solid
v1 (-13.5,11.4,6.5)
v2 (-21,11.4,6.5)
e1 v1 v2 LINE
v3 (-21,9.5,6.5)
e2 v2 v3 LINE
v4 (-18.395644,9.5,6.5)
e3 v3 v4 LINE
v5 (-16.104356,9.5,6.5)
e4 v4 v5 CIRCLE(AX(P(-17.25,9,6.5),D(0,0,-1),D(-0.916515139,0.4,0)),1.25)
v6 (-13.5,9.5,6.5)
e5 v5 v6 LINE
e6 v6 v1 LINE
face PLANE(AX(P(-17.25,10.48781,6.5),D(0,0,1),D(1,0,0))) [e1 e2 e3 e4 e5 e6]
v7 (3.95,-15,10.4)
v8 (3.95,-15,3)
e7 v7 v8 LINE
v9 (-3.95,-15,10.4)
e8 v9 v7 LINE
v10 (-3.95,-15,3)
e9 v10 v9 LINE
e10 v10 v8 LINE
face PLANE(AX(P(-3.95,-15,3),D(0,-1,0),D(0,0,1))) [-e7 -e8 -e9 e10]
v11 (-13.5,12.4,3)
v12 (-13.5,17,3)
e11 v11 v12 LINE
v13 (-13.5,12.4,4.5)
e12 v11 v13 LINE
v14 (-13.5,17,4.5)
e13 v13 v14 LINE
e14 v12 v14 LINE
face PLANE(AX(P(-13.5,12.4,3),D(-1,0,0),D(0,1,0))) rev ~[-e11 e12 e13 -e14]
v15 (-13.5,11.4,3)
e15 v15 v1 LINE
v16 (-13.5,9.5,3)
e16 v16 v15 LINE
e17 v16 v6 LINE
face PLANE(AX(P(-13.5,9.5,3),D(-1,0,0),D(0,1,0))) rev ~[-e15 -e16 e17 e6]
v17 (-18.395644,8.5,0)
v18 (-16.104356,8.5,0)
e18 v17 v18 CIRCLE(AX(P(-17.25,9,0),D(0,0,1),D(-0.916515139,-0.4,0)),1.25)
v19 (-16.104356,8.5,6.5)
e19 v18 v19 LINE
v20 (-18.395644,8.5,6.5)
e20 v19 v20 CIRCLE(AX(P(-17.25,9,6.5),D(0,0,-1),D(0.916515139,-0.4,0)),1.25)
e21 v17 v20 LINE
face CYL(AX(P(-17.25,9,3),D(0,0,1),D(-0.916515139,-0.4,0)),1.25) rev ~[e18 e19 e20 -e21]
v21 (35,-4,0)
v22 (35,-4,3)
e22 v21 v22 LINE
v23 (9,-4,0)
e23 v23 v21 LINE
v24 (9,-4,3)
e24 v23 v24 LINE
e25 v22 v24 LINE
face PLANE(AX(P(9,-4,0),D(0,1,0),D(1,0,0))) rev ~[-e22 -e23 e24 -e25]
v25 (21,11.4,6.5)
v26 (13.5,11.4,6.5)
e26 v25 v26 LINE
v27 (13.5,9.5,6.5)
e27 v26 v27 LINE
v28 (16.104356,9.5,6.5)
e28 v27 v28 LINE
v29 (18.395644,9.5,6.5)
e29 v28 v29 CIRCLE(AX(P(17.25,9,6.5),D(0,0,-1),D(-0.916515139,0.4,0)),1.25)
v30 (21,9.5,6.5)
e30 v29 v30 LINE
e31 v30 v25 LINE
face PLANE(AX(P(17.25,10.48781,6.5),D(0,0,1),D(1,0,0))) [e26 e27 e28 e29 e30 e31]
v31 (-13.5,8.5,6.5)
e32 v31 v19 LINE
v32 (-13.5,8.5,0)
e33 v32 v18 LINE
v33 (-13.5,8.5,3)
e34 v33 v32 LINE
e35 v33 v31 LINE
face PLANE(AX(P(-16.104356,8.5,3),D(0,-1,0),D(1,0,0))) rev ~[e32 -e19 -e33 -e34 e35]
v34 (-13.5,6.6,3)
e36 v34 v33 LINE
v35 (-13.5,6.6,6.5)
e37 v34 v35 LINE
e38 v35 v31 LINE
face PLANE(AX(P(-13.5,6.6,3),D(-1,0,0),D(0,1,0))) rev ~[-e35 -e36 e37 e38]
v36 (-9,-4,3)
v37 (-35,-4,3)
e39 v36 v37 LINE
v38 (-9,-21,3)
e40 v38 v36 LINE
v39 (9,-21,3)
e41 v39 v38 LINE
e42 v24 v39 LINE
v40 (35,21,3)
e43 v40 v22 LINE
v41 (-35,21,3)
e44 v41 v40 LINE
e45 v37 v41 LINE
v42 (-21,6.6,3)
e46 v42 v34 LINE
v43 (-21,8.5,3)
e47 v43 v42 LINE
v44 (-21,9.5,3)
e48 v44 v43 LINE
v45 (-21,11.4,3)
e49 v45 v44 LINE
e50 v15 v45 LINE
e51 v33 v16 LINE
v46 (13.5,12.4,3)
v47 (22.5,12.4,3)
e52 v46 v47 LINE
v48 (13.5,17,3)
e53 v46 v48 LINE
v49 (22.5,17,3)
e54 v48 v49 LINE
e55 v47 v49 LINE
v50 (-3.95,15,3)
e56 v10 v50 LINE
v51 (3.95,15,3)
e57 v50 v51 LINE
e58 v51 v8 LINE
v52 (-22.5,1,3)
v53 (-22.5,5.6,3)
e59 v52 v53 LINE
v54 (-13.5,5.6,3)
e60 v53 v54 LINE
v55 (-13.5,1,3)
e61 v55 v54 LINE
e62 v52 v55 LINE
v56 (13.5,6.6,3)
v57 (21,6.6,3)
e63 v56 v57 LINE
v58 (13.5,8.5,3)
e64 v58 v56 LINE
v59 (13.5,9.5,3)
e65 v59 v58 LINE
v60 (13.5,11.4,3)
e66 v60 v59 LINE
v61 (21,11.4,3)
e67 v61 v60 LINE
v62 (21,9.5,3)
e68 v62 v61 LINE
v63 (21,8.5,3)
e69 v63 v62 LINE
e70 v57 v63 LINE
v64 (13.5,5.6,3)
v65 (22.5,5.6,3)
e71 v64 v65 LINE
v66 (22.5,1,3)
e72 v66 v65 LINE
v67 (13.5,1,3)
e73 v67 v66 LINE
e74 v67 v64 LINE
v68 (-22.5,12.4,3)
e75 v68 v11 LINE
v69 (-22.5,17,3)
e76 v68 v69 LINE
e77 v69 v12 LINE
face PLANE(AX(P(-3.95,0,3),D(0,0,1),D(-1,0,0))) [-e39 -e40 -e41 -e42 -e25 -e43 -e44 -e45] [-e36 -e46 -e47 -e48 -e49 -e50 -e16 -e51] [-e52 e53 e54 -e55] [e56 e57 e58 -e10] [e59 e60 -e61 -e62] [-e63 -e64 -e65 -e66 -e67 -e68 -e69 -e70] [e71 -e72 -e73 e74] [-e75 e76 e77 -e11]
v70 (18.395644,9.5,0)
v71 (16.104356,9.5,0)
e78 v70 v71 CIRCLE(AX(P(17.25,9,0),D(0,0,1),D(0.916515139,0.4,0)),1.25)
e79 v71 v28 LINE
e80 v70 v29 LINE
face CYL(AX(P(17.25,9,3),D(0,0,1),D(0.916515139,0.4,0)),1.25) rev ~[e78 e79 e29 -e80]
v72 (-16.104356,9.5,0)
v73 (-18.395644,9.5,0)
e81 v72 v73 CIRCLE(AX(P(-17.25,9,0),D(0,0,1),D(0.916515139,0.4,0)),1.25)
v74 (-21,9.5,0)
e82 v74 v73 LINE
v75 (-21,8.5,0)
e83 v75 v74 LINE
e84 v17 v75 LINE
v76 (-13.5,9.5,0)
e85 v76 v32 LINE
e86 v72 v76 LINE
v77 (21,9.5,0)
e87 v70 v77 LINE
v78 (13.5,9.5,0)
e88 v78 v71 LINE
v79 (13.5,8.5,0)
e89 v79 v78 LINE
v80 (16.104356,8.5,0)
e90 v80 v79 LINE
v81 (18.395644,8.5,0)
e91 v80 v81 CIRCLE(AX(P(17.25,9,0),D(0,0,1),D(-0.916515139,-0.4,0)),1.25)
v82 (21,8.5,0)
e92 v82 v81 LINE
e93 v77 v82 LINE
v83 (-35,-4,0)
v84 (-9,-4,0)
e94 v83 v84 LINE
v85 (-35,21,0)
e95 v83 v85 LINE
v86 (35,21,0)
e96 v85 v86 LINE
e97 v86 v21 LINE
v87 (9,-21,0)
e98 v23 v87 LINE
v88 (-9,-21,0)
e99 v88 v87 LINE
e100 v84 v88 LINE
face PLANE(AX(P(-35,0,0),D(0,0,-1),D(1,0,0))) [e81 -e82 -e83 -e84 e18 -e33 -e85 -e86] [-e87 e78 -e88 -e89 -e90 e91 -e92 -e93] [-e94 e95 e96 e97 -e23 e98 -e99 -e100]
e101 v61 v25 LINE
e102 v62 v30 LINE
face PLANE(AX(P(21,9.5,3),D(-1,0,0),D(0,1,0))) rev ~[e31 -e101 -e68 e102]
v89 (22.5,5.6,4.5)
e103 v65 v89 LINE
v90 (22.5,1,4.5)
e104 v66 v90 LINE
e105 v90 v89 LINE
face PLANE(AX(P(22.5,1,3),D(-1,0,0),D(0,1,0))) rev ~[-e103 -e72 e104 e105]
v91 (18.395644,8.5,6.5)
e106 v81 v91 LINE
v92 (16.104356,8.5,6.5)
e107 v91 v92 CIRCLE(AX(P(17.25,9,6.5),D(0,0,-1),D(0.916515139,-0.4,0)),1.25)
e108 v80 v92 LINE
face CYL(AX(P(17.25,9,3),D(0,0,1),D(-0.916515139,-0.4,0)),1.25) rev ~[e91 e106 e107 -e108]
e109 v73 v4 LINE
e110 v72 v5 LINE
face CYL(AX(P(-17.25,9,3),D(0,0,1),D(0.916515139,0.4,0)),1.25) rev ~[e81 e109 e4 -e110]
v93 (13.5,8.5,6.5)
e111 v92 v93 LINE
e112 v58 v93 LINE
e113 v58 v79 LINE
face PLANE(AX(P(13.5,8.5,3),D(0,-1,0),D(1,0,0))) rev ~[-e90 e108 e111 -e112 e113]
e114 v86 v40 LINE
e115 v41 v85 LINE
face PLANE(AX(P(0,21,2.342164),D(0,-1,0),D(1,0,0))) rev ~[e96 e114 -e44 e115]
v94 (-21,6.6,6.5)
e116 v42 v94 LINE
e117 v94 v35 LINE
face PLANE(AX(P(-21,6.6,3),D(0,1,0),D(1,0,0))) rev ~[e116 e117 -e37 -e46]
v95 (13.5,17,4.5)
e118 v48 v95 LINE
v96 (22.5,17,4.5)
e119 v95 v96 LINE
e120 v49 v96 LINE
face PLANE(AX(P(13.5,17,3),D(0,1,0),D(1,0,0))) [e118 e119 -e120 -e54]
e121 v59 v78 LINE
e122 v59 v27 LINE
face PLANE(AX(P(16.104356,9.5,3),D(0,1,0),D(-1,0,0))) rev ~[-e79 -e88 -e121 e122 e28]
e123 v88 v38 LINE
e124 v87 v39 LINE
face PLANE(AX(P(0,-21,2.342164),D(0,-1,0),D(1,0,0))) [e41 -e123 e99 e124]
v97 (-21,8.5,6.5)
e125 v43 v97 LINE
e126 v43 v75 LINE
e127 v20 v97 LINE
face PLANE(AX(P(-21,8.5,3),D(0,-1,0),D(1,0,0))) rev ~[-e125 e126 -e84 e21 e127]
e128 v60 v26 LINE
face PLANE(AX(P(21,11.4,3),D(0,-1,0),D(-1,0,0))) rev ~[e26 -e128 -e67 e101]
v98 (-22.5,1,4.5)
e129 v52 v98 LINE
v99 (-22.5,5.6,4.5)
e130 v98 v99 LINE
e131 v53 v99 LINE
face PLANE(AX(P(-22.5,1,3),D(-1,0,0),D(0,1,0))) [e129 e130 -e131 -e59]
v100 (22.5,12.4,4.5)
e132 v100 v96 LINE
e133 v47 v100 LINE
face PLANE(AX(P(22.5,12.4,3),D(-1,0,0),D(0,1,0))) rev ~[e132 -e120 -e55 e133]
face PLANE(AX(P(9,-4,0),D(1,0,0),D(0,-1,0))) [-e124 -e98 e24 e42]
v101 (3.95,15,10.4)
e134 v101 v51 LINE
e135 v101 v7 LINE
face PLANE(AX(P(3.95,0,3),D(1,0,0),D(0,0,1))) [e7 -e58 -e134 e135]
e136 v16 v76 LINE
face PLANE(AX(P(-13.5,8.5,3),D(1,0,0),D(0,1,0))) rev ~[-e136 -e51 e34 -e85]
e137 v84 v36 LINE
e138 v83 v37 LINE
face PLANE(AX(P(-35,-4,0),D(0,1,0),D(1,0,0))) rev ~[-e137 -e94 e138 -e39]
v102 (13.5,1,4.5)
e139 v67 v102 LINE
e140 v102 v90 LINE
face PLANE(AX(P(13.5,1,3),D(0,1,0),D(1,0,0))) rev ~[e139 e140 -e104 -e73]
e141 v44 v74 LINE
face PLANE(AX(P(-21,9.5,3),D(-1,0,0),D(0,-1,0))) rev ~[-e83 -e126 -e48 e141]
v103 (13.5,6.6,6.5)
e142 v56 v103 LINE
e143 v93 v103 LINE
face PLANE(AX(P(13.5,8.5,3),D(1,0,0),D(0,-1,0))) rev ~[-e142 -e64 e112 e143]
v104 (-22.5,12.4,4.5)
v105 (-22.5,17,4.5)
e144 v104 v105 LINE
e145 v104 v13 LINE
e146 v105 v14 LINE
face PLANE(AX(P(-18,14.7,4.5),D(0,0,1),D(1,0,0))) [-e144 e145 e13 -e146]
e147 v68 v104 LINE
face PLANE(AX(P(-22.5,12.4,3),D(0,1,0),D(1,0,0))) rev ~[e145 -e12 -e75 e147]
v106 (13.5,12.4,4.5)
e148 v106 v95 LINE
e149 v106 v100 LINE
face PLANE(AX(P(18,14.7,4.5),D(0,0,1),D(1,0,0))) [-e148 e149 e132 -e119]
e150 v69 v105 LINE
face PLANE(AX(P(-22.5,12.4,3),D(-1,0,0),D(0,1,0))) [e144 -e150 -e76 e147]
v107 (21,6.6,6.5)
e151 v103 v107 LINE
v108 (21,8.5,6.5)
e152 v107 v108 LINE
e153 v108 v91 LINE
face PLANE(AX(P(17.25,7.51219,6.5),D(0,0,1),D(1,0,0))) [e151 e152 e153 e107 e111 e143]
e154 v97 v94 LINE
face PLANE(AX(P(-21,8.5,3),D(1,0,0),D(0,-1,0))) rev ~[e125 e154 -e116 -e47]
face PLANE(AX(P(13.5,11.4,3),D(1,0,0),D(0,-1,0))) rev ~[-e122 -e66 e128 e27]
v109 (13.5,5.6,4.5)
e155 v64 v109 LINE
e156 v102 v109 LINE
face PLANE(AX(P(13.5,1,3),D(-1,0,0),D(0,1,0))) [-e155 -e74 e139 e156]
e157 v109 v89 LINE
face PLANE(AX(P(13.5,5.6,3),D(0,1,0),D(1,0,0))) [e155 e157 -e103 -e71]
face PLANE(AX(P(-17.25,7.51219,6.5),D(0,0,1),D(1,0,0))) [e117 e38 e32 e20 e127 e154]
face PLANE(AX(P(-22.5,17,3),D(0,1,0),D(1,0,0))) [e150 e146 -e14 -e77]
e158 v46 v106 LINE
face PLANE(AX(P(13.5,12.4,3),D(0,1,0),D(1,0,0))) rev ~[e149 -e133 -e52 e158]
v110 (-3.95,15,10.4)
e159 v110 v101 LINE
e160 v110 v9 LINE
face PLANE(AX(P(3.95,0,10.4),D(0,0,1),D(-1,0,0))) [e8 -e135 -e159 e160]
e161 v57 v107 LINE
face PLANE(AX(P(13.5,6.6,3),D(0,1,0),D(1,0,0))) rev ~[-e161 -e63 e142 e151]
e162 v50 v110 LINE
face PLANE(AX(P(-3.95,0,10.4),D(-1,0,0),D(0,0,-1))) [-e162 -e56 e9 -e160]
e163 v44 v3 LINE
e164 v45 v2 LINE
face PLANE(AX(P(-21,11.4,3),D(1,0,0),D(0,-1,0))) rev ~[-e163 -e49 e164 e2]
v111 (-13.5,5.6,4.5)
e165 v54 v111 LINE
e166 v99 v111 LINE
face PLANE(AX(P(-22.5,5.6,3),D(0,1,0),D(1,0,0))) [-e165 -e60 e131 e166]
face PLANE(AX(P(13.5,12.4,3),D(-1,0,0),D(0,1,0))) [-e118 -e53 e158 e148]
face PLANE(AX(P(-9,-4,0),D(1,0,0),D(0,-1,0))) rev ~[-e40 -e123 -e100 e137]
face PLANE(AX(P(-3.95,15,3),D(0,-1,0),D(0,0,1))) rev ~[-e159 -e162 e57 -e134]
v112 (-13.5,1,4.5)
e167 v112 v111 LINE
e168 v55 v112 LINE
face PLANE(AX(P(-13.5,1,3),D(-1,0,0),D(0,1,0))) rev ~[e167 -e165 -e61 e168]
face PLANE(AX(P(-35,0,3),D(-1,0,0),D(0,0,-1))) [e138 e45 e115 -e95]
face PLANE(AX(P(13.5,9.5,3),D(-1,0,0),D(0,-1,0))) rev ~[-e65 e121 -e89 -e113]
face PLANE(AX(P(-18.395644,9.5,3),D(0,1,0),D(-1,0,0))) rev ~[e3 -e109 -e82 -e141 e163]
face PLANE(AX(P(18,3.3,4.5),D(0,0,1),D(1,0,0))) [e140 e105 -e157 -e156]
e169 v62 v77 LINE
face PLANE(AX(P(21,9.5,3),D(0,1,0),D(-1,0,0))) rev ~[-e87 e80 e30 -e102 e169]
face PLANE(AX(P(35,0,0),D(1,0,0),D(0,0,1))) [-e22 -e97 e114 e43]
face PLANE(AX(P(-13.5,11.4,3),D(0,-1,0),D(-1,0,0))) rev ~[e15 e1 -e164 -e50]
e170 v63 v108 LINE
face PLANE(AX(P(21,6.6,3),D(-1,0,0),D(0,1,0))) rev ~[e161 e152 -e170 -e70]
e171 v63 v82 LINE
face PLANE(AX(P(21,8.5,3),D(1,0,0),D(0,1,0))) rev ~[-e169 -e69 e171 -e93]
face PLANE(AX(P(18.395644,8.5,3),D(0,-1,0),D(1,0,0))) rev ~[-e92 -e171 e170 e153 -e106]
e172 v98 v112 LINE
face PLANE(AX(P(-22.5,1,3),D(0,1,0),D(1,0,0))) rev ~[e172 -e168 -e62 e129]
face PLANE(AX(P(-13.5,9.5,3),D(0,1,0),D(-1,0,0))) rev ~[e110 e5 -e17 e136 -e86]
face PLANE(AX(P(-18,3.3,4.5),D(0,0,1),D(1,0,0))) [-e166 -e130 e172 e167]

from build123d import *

# Parameters (mm, degrees)
F1_DEPTH = 21
F2_W     = 26
F2_H     = 17
F3_DEPTH = 25
F4_W     = 6
F4_H     = 7.4
F5_DEPTH = 25
F6_W     = 9
F6_H     = 4.6
F7_DEPTH = 1.5
F8_DEPTH = 3.5
F9_DEPTH = 3.001


with BuildPart() as f1:
    # F0 (on Front) → F1 (new body, symmetric)
    with BuildSketch(Plane.XZ):
        Polygon((-35, 0), (35, 0), (35, 3), (3.95, 3), (3.95, 10.4), (0, 10.4), (-3.95, 10.4), (-3.95, 3), (-35, 3), align=None)
    extrude(amount=F1_DEPTH, both=True)

    # F2 (on face) → F3 (cut)
    with BuildSketch(Plane(origin=(0, 0, 0), x_dir=(1, 0, 0), z_dir=(0, 0, -1))):
        with Locations((-22, 12.5)):
            Rectangle(F2_W, F2_H)
        with Locations((22, 12.5)):
            Rectangle(F2_W, F2_H)
    extrude(amount=-F3_DEPTH, mode=Mode.SUBTRACT)

    # F4 (on face) → F5 (cut)
    with BuildSketch(Plane(origin=(-3.95, 0, 0), x_dir=(0, -1, 0), z_dir=(-1, 0, 0))):
        with Locations((-18, 6.7)):
            Rectangle(F4_W, F4_H)
        with Locations((18, 6.7)):
            Rectangle(F4_W, F4_H)
    extrude(amount=-F5_DEPTH, mode=Mode.SUBTRACT)

    # F6 (on face) → F7 (join)
    with BuildSketch(Plane.XY.offset(3)):
        with Locations((-18, 14.7)):
            Rectangle(F6_W, F6_H)
        with Locations((-18, 3.3)):
            Rectangle(F6_W, F6_H)
        with Locations((18, 14.7)):
            Rectangle(F6_W, F6_H)
        with Locations((18, 3.3)):
            Rectangle(F6_W, F6_H)
    extrude(amount=F7_DEPTH)

    # F6 (on face) → F8 (join)
    with BuildSketch(Plane.XY.offset(3)):
        with BuildLine():
            Line((-13.5, 9.5), (-13.5, 11.4))
            Line((-13.5, 11.4), (-21, 11.4))
            Line((-21, 11.4), (-21, 9.5))
            Line((-21, 9.5), (-18.3956439237, 9.5))
            ThreePointArc((-18.3956439237, 9.5), (-17.25, 10.25), (-16.1043560763, 9.5))
            Line((-16.1043560763, 9.5), (-13.5, 9.5))
        make_face()
        with BuildLine():
            Line((-13.5, 6.6), (-13.5, 8.5))
            Line((-13.5, 8.5), (-16.1043560763, 8.5))
            ThreePointArc((-16.1043560763, 8.5), (-17.25, 7.75), (-18.3956439237, 8.5))
            Line((-18.3956439237, 8.5), (-21, 8.5))
            Line((-21, 8.5), (-21, 6.6))
            Line((-21, 6.6), (-13.5, 6.6))
        make_face()
        with BuildLine():
            Line((21, 11.4), (13.5, 11.4))
            Line((13.5, 11.4), (13.5, 9.5))
            Line((13.5, 9.5), (16.1043560763, 9.5))
            ThreePointArc((16.1043560763, 9.5), (17.25, 10.25), (18.3956439237, 9.5))
            Line((18.3956439237, 9.5), (21, 9.5))
            Line((21, 9.5), (21, 11.4))
        make_face()
        with BuildLine():
            Line((13.5, 8.5), (13.5, 6.6))
            Line((13.5, 6.6), (21, 6.6))
            Line((21, 6.6), (21, 8.5))
            Line((21, 8.5), (18.3956439237, 8.5))
            ThreePointArc((18.3956439237, 8.5), (17.25, 7.75), (16.1043560763, 8.5))
            Line((16.1043560763, 8.5), (13.5, 8.5))
        make_face()
    extrude(amount=F8_DEPTH)

    # F6 (on face) → F9 (cut, through all)
    with BuildSketch(Plane.XY.offset(3)):
        with BuildLine():
            Line((-13.5, 8.5), (-13.5, 9.5))
            Line((-13.5, 9.5), (-16.1043560763, 9.5))
            ThreePointArc((-16.1043560763, 9.5), (-16.0263671088, 9.2553870546), (-16, 9))
            ThreePointArc((-16, 9), (-16.0263671088, 8.7446129454), (-16.1043560763, 8.5))
            Line((-16.1043560763, 8.5), (-13.5, 8.5))
        make_face()
        with BuildLine():
            ThreePointArc((-16, 9), (-16.0263671088, 9.2553870546), (-16.1043560763, 9.5))
            Line((-16.1043560763, 9.5), (-18.3956439237, 9.5))
            ThreePointArc((-18.3956439237, 9.5), (-18.5, 9), (-18.3956439237, 8.5))
            Line((-18.3956439237, 8.5), (-16.1043560763, 8.5))
            ThreePointArc((-16.1043560763, 8.5), (-16.0263671088, 8.7446129454), (-16, 9))
        make_face()
        with BuildLine():
            Line((-18.3956439237, 9.5), (-21, 9.5))
            Line((-21, 9.5), (-21, 8.5))
            Line((-21, 8.5), (-18.3956439237, 8.5))
            ThreePointArc((-18.3956439237, 8.5), (-18.5, 9), (-18.3956439237, 9.5))
        make_face()
        with BuildLine():
            Line((16.1043560763, 9.5), (13.5, 9.5))
            Line((13.5, 9.5), (13.5, 8.5))
            Line((13.5, 8.5), (16.1043560763, 8.5))
            ThreePointArc((16.1043560763, 8.5), (16, 9), (16.1043560763, 9.5))
        make_face()
        with BuildLine():
            Line((18.3956439237, 9.5), (16.1043560763, 9.5))
            ThreePointArc((16.1043560763, 9.5), (16, 9), (16.1043560763, 8.5))
            Line((16.1043560763, 8.5), (18.3956439237, 8.5))
            ThreePointArc((18.3956439237, 8.5), (18.4736328912, 8.7446129454), (18.5, 9))
            ThreePointArc((18.5, 9), (18.4736328912, 9.2553870546), (18.3956439237, 9.5))
        make_face()
        with BuildLine():
            Line((21, 8.5), (21, 9.5))
            Line((21, 9.5), (18.3956439237, 9.5))
            ThreePointArc((18.3956439237, 9.5), (18.4736328912, 9.2553870546), (18.5, 9))
            ThreePointArc((18.5, 9), (18.4736328912, 8.7446129454), (18.3956439237, 8.5))
            Line((18.3956439237, 8.5), (21, 8.5))
        make_face()
        with BuildLine():
            Line((-18.3956439237, 9.5), (-16.1043560763, 9.5))
            ThreePointArc((-16.1043560763, 9.5), (-17.25, 10.25), (-18.3956439237, 9.5))
        make_face()
        with BuildLine():
            ThreePointArc((-18.3956439237, 8.5), (-17.25, 7.75), (-16.1043560763, 8.5))
            Line((-16.1043560763, 8.5), (-18.3956439237, 8.5))
        make_face()
        with BuildLine():
            ThreePointArc((18.3956439237, 9.5), (17.25, 10.25), (16.1043560763, 9.5))
            Line((16.1043560763, 9.5), (18.3956439237, 9.5))
        make_face()
        with BuildLine():
            Line((18.3956439237, 8.5), (16.1043560763, 8.5))
            ThreePointArc((16.1043560763, 8.5), (17.25, 7.75), (18.3956439237, 8.5))
        make_face()
    extrude(amount=-F9_DEPTH, mode=Mode.SUBTRACT)


solid = f1.part
